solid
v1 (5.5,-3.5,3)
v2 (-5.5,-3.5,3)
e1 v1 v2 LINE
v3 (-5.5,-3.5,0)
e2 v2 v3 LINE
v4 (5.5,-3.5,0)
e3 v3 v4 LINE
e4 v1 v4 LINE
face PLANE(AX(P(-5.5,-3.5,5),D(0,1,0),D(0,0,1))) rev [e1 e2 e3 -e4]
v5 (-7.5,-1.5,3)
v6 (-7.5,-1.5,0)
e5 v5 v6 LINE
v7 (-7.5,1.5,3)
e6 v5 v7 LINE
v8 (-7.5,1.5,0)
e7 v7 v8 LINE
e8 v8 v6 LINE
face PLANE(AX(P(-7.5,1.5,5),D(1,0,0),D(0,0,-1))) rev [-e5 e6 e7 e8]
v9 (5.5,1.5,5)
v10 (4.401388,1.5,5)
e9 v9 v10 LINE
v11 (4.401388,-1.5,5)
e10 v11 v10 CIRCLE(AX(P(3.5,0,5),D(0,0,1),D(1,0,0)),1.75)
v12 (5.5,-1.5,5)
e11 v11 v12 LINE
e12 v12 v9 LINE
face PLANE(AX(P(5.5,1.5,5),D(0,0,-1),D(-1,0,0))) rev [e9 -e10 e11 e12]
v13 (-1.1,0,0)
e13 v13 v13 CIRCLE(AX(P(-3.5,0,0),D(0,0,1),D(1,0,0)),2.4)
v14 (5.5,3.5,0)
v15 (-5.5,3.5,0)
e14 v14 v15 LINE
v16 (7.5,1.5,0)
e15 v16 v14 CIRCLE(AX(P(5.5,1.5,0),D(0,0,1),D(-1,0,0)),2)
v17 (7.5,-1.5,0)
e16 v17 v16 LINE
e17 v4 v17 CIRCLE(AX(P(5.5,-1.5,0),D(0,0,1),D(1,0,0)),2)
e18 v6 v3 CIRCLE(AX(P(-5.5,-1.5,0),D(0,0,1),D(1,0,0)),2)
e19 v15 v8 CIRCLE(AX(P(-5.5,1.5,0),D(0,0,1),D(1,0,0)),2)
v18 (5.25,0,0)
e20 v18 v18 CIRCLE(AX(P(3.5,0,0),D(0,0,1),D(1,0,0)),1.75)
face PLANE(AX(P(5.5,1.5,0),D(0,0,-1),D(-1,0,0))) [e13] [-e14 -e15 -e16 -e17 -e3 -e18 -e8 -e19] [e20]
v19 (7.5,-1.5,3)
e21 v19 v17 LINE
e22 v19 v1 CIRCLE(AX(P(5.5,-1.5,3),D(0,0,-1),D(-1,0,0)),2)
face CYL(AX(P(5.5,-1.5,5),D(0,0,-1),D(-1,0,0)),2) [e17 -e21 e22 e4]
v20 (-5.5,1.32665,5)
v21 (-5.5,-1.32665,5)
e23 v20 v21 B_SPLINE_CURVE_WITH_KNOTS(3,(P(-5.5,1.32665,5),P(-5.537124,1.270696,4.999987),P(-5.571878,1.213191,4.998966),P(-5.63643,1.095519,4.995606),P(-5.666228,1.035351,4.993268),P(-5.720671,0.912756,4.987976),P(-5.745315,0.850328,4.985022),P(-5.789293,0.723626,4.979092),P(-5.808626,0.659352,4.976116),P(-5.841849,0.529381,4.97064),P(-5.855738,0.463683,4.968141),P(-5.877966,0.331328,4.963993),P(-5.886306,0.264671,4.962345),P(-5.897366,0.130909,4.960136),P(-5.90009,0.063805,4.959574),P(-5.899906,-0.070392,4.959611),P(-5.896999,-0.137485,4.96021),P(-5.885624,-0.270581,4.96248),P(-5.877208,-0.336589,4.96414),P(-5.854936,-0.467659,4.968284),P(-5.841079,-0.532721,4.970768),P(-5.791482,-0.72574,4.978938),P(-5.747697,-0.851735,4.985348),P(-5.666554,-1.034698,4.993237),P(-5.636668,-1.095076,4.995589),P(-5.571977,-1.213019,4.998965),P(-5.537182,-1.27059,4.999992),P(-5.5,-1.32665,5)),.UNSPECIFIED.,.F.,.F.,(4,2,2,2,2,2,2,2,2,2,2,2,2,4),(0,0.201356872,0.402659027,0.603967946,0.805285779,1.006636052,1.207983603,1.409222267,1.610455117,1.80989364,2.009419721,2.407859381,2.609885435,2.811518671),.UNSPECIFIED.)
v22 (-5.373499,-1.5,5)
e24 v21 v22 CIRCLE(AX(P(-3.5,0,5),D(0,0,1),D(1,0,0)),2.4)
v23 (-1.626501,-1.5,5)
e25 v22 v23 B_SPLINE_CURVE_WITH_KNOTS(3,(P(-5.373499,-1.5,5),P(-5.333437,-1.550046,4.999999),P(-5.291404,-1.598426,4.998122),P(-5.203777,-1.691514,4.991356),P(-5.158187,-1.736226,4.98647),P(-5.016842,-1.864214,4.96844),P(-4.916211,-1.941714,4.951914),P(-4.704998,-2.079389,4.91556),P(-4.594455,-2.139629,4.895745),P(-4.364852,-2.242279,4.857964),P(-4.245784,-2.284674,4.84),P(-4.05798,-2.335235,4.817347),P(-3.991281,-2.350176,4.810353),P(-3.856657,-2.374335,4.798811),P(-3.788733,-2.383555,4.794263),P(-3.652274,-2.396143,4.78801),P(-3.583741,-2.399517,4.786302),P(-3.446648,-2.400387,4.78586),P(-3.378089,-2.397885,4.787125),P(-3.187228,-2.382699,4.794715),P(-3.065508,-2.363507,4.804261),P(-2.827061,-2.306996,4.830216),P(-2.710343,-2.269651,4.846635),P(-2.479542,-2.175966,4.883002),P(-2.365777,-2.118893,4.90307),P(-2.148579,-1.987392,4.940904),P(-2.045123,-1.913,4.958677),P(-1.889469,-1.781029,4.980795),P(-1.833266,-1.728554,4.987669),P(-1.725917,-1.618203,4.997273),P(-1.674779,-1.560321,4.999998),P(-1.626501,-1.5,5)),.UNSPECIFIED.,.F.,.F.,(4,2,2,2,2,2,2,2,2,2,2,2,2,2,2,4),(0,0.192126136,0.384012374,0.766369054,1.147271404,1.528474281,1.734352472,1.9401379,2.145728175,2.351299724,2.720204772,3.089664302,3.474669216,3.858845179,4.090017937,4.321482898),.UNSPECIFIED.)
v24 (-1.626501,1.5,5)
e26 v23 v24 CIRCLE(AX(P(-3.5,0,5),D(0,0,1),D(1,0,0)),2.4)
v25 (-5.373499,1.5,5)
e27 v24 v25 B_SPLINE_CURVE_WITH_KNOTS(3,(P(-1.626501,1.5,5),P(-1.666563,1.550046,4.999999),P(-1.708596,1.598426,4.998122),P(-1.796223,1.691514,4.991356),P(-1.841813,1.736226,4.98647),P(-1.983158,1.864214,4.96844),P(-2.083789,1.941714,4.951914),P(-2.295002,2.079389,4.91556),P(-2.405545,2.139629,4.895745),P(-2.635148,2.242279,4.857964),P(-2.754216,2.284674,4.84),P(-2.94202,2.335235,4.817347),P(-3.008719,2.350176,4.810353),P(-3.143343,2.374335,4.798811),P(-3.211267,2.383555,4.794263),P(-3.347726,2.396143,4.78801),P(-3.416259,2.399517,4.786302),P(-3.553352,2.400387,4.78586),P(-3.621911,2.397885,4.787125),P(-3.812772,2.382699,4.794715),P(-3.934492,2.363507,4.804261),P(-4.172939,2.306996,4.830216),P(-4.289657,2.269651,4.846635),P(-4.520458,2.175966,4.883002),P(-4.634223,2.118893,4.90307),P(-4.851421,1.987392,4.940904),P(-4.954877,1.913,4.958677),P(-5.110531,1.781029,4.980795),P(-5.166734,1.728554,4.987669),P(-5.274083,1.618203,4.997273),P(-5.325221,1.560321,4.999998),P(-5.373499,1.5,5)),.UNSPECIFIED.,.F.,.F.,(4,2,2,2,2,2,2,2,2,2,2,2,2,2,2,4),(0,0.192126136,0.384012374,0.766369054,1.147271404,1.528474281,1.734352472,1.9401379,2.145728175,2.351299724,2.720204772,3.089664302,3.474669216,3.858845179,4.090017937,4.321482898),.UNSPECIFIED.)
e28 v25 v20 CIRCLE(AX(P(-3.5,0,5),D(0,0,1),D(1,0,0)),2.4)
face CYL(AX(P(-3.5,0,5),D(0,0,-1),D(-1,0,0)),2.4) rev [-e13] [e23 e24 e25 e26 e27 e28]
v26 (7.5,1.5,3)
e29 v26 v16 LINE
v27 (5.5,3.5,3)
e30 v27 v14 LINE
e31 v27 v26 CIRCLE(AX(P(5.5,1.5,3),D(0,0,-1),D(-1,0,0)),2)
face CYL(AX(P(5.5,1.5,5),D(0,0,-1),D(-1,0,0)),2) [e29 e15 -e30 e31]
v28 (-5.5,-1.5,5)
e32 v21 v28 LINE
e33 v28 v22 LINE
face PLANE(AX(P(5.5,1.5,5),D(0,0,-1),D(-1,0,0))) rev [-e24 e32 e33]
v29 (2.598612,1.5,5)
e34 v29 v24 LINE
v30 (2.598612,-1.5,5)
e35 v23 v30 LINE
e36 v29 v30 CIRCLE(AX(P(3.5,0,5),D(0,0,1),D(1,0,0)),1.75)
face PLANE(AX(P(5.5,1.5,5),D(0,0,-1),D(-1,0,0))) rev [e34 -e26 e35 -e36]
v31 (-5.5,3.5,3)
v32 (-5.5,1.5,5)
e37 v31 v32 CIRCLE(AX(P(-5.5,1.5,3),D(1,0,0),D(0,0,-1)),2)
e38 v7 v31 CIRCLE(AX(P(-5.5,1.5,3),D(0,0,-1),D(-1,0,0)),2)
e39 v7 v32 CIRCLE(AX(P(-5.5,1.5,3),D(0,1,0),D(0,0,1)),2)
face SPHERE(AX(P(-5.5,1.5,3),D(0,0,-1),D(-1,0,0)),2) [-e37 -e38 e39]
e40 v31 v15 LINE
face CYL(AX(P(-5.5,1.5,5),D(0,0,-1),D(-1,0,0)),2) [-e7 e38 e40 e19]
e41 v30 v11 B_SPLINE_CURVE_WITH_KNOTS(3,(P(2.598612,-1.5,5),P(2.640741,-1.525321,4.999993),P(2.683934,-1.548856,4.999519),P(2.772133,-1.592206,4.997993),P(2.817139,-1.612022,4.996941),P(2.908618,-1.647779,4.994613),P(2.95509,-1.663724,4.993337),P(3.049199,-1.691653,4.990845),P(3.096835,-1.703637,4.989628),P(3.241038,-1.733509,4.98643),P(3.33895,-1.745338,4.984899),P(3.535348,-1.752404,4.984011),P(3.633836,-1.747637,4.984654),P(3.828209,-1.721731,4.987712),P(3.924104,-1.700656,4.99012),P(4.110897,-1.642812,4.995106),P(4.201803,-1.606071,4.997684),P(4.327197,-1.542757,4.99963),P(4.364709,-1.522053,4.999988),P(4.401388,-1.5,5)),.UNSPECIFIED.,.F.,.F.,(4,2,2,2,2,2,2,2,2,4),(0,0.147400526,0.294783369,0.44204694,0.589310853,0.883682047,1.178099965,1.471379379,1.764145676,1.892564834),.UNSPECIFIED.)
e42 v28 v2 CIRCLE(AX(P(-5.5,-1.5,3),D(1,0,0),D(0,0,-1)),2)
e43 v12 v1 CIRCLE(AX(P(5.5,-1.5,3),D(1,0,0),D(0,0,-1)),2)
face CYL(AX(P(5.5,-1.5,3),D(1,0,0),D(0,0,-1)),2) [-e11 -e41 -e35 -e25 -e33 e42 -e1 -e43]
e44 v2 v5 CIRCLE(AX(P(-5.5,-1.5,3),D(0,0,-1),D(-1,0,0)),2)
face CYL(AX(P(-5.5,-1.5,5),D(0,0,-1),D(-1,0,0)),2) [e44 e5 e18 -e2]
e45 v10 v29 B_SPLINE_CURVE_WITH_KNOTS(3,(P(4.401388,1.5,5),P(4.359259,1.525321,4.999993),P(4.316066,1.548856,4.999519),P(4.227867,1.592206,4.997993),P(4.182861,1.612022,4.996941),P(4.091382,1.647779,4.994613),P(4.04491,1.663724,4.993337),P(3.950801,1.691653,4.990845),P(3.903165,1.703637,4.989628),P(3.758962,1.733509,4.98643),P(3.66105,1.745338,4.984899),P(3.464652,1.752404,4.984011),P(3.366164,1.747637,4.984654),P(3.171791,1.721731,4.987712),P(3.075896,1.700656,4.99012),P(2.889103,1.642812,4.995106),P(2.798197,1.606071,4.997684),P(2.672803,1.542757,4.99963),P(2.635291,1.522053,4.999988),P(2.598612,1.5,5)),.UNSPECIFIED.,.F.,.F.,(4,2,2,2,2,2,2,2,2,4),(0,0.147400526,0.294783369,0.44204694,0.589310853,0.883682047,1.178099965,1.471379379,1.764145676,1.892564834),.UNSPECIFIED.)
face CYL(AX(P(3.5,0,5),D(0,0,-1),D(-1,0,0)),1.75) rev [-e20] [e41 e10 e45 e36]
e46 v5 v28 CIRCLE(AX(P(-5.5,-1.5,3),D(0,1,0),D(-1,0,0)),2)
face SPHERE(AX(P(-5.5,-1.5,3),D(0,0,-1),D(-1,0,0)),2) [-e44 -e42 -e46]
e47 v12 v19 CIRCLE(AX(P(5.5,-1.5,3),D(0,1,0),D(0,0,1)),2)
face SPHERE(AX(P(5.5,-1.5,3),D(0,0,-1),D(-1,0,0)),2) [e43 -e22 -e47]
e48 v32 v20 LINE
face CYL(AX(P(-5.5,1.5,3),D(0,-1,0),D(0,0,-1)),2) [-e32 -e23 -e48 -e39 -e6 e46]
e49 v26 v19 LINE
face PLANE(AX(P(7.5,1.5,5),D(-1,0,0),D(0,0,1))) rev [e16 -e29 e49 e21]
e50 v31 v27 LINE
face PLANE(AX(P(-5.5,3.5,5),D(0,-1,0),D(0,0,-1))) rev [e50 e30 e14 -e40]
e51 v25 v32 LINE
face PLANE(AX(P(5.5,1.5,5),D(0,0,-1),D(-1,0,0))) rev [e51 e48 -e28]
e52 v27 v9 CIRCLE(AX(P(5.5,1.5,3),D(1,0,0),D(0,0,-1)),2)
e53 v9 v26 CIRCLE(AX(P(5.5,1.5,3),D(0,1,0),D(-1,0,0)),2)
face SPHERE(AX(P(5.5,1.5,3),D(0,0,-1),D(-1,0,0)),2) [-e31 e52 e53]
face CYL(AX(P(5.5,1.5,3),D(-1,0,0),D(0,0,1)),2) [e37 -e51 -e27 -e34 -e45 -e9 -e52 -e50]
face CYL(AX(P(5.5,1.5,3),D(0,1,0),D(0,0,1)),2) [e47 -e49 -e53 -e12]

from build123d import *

# Parameters (mm, degrees)
SKETCH1_R           = 2.399999999999999
SKETCH1_R_2         = 1.75
BOSS_EXTRUDE1_DEPTH = 5
FILLET1_R           = 2


with BuildPart() as part:
    # Sketch1 → Boss-Extrude1 (new body)
    with BuildSketch(Plane.XY):
        with BuildLine():
            Line((-5.500000000000002, 3.5), (5.499999999999998, 3.5))
            ThreePointArc((5.499999999999998, 3.5), (6.914213562373094, 2.914213562373095), (7.499999999999998, 1.4999999999999998))
            Line((7.499999999999998, 1.4999999999999998), (7.499999999999998, -1.5000000000000002))
            ThreePointArc((7.499999999999998, -1.5000000000000002), (6.914213562373094, -2.914213562373096), (5.499999999999998, -3.500000000000001))
            Line((5.499999999999998, -3.500000000000001), (-5.500000000000002, -3.500000000000001))
            ThreePointArc((-5.500000000000002, -3.500000000000001), (-6.914213562373097, -2.914213562373096), (-7.500000000000002, -1.5000000000000007))
            Line((-7.500000000000002, -1.5000000000000007), (-7.500000000000002, 1.4999999999999993))
            ThreePointArc((-7.500000000000002, 1.4999999999999993), (-6.914213562373097, 2.914213562373095), (-5.500000000000002, 3.5))
        make_face()
        with Locations((-3.5000000000000013, 0)):
            Circle(SKETCH1_R, mode=Mode.SUBTRACT)
        with Locations((3.5000000000000013, 1.29e-15)):
            Circle(SKETCH1_R_2, mode=Mode.SUBTRACT)
    extrude(amount=BOSS_EXTRUDE1_DEPTH)

    # Fillet1
    # the kernel refuses this fillet: 2 mm, written as the material it takes off along each edge
    with BuildSketch(Plane(origin=(-5.500000000000001, 1.4999999999999987, 5), x_dir=(-1, 3.3e-16, 0), z_dir=(-3.3e-16, -1, 0))) as fillet1_piece_1:
        with BuildLine():
            CenterArc((2.000000000000001 - FILLET1_R, FILLET1_R), FILLET1_R, 270, 90)
            Line((2.000000000000001 - FILLET1_R, 0), (2.000000000000001, 0))
            Line((2.000000000000001, 0), (2.000000000000001, FILLET1_R))
        make_face()
    revolve(axis=Axis((-5.500000000000001, 1.4999999999999987, 5), (0, 0, -1)), revolution_arc=89.99999999999996, mode=Mode.SUBTRACT)
    with BuildSketch(Plane(origin=(-7.500000000000002, -1.5000000000000007, 5), x_dir=(0, 0, -1), z_dir=(0, 1, 0)), Plane(origin=(7.499999999999998, 1.4999999999999998, 5), x_dir=(0, 0, -1), z_dir=(0, -1, 0))) as fillet1_piece_2:
        with BuildLine():
            CenterArc((FILLET1_R, -FILLET1_R), FILLET1_R, 90, 90)
            Line((0, -FILLET1_R), (0, 0))
            Line((0, 0), (FILLET1_R, 0))
        make_face()
    extrude(amount=3, mode=Mode.SUBTRACT)
    with BuildSketch(Plane(origin=(-5.500000000000002, -1.5000000000000002, 5), x_dir=(0, -1, 0), z_dir=(1, 0, 0))) as fillet1_piece_3:
        with BuildLine():
            CenterArc((2.000000000000001 - FILLET1_R, FILLET1_R), FILLET1_R, 270, 90)
            Line((2.000000000000001 - FILLET1_R, 0), (2.000000000000001, 0))
            Line((2.000000000000001, 0), (2.000000000000001, FILLET1_R))
        make_face()
    revolve(axis=Axis((-5.500000000000002, -1.5000000000000002, 5), (0, 0, -1)), revolution_arc=89.99999999999999, mode=Mode.SUBTRACT)
    with BuildSketch(Plane(origin=(5.499999999999998, -3.500000000000001, 5), x_dir=(0, 0, -1), z_dir=(-1, 0, 0)), Plane(origin=(-5.500000000000002, 3.5, 5), x_dir=(0, 0, -1), z_dir=(1, 0, 0))) as fillet1_piece_4:
        with BuildLine():
            CenterArc((FILLET1_R, -FILLET1_R), FILLET1_R, 90, 90)
            Line((0, -FILLET1_R), (0, 0))
            Line((0, 0), (FILLET1_R, 0))
        make_face()
    extrude(amount=11, mode=Mode.SUBTRACT)
    with BuildSketch(Plane(origin=(5.499999999999999, -1.5000000000000018, 5), x_dir=(1, 7.8e-16, 0), z_dir=(-7.8e-16, 1, 0))) as fillet1_piece_5:
        with BuildLine():
            CenterArc((1.9999999999999991 - FILLET1_R, FILLET1_R), FILLET1_R, 270, 90)
            Line((1.9999999999999991 - FILLET1_R, 0), (1.9999999999999991, 0))
            Line((1.9999999999999991, 0), (1.9999999999999991, FILLET1_R))
        make_face()
    revolve(axis=Axis((5.499999999999999, -1.5000000000000018, 5), (0, 0, -1)), revolution_arc=90.00000000000007, mode=Mode.SUBTRACT)
    with BuildSketch(Plane(origin=(5.499999999999999, 1.5000000000000013, 5), x_dir=(-4.4e-16, 1, 0), z_dir=(-1, -4.4e-16, 0))) as fillet1_piece_6:
        with BuildLine():
            CenterArc((1.9999999999999987 - FILLET1_R, FILLET1_R), FILLET1_R, 270, 90)
            Line((1.9999999999999987 - FILLET1_R, 0), (1.9999999999999987, 0))
            Line((1.9999999999999987, 0), (1.9999999999999987, FILLET1_R))
        make_face()
    revolve(axis=Axis((5.499999999999999, 1.5000000000000013, 5), (0, 0, -1)), revolution_arc=90.00000000000007, mode=Mode.SUBTRACT)


solid = part.part
